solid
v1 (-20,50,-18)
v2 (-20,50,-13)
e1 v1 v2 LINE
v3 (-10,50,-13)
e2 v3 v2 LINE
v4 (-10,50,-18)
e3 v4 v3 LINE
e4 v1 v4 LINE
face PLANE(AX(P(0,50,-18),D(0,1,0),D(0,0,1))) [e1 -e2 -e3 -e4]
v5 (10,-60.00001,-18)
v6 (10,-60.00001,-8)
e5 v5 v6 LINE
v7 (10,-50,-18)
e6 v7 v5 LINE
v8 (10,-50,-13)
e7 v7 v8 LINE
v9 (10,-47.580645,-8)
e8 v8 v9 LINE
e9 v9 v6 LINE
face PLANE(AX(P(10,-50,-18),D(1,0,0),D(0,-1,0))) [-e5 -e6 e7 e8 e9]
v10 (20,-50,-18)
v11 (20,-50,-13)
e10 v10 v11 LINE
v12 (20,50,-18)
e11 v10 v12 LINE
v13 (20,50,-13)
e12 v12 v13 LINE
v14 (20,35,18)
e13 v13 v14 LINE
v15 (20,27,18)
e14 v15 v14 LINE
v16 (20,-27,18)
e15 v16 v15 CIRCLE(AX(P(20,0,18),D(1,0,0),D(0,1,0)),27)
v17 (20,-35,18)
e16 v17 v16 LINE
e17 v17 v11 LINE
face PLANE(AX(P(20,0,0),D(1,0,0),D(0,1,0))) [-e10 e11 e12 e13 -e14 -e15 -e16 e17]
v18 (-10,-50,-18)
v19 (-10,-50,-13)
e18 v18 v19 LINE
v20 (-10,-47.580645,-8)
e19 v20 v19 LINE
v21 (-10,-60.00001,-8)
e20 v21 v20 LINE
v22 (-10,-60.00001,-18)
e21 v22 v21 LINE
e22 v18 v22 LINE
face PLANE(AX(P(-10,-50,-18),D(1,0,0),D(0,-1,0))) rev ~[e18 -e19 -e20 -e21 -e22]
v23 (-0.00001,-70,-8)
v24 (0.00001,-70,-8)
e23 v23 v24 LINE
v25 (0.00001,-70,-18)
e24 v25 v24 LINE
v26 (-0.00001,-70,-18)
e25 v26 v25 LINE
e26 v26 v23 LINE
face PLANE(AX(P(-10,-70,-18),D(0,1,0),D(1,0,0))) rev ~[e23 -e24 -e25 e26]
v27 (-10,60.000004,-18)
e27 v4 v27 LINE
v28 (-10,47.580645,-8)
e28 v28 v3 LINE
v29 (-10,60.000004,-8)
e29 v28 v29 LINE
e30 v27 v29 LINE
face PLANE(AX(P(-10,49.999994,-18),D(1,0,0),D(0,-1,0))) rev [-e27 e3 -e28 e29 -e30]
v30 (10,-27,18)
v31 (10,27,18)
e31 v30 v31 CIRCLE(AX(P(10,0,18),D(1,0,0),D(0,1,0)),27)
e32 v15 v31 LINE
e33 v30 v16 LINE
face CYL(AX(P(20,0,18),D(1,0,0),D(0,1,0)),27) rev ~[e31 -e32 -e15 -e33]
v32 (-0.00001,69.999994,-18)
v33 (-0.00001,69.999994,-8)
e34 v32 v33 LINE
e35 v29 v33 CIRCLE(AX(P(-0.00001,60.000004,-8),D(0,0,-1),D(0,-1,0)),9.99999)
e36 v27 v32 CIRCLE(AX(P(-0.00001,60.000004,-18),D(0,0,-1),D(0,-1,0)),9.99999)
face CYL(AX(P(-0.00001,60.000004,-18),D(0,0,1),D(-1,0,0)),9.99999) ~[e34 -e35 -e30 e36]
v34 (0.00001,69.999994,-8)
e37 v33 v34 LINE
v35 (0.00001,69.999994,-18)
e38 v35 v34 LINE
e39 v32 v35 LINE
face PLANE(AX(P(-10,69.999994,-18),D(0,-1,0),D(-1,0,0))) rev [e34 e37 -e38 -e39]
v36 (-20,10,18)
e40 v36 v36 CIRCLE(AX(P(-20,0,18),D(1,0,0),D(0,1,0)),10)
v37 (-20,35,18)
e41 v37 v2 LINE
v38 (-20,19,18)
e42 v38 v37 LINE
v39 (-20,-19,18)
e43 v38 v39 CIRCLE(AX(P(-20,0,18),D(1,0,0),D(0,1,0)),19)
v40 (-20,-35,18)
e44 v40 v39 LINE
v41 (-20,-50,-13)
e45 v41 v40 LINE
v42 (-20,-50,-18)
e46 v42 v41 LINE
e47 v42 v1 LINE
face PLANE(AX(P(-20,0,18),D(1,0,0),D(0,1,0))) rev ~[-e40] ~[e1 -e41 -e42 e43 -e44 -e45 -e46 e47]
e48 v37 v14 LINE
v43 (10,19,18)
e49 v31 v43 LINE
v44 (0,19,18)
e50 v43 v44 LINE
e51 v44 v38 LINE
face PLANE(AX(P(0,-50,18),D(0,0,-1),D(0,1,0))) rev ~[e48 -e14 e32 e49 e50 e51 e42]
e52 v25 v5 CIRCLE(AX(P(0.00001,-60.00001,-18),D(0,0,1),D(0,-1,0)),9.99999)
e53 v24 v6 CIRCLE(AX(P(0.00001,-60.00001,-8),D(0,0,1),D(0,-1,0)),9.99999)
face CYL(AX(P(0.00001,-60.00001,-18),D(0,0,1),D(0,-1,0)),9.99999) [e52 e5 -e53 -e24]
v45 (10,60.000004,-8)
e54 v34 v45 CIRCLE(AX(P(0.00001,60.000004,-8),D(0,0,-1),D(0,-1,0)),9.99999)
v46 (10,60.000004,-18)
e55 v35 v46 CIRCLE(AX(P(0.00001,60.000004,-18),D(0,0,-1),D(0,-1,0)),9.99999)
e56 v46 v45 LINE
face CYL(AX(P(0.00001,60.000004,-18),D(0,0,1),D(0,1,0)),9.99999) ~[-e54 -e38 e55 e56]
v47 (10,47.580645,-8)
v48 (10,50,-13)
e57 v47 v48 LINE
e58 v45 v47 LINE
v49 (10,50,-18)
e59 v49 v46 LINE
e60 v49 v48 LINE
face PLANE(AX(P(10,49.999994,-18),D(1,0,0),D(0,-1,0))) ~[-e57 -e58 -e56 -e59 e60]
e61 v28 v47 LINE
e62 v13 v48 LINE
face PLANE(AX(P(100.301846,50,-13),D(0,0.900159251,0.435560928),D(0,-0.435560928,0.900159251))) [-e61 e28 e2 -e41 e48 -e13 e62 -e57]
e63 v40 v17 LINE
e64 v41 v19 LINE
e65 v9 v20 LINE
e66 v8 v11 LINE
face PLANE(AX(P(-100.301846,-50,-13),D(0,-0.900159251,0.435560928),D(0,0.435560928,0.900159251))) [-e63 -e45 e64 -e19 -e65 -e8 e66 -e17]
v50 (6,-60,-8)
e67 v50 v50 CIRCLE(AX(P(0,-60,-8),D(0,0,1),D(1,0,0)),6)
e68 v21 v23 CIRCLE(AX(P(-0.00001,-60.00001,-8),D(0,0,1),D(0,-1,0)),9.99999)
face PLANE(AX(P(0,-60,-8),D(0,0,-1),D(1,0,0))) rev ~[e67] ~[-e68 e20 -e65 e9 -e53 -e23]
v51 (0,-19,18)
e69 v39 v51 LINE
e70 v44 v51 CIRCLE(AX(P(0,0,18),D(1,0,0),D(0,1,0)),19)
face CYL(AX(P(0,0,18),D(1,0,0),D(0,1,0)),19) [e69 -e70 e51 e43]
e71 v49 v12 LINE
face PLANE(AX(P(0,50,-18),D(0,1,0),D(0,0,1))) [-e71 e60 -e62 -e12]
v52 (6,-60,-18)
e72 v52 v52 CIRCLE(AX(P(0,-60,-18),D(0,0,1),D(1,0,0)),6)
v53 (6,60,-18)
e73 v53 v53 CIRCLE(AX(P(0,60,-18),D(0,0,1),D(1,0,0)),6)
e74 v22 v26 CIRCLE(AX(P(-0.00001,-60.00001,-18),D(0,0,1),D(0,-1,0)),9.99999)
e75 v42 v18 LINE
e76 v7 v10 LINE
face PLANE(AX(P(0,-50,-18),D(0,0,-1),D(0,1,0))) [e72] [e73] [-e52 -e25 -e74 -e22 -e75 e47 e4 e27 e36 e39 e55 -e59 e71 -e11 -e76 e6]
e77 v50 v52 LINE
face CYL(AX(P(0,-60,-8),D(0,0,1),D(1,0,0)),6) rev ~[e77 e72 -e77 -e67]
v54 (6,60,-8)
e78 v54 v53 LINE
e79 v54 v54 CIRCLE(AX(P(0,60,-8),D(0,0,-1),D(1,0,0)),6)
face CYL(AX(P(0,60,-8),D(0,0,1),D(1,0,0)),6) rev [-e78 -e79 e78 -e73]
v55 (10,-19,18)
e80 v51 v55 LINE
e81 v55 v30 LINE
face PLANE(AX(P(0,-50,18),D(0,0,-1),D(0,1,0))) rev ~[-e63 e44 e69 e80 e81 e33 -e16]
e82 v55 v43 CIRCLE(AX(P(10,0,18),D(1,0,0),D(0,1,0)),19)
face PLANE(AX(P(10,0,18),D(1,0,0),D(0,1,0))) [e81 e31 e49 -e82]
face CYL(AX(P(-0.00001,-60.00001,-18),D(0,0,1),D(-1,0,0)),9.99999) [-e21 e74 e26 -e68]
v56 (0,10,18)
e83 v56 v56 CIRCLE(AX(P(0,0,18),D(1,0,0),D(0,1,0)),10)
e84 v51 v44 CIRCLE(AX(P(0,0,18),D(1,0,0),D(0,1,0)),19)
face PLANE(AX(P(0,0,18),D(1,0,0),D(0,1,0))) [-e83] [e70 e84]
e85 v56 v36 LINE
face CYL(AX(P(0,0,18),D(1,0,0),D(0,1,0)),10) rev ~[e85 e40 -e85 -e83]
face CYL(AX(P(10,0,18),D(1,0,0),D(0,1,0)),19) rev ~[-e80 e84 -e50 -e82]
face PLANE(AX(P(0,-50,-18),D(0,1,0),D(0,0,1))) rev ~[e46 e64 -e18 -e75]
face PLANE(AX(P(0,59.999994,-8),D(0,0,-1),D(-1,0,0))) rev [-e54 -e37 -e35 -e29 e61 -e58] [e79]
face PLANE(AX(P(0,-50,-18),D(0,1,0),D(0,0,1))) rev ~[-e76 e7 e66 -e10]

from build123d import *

# Parameters (mm, degrees)
F0_W         = 100
F0_H         = 36
F1_DEPTH     = 20
F2_W         = 20
F2_H         = 20
F3_DEPTH     = 10
F4_R         = 9.99999
F5_T4_DEPTH  = 200.6036926139
F5_T10_DEPTH = 200.6036926139
F5_T16_DEPTH = 200.6036926139
F5_T23_DEPTH = 200.6036926139
F5_T29_DEPTH = 200.6036926139
F6_R         = 6
F7_DEPTH     = 10.001
F8_T4_DEPTH  = 200.6036926139
F8_T10_DEPTH = 200.6036926139
F8_T16_DEPTH = 200.6036926139
F8_T23_DEPTH = 200.6036926139
F8_T29_DEPTH = 200.6036926139
F9_R         = 27
F10_DEPTH    = 10
F11_R        = 19
F12_DEPTH    = 10
F13_R        = 19
F14_DEPTH    = 20
F15_R        = 10
F16_DEPTH    = 20.001


# Not quite as in the source:
# - a fillet or chamfer that OpenCascade refuses, or shapes differently, is made with other operations: its cross-section is extruded or revolved along the edge and cut away or added
# - a fillet or chamfer is up to 0.001 mm smaller than in the source, because OpenCascade refuses the exact size
# - a pattern or mirror of a feature is missing from the dataset's text; its kind, count and spacing are read off the source's solid


with BuildPart() as f1:
    # F0 (on Right) → F1 (new body, symmetric)
    with BuildSketch(Plane.YZ):
        Rectangle(F0_W, F0_H)
    extrude(amount=F1_DEPTH, both=True)

    # F2 (on face) → F3 (join)
    with BuildSketch(Plane(origin=(0, 0, -18), x_dir=(1, 0, 0), z_dir=(0, 0, -1))):
        with Locations((0, 60)):
            Rectangle(F2_W, F2_H)
    f3 = extrude(amount=-F3_DEPTH)

    # F3_copies: F3 across plane
    add(f3.mirror(Plane.ZX.offset(-3e-06)))

    # F4 (radius 10 in the source; OpenCascade refuses exactly that, so slightly less here)
    f4_edges = [f1.edges().sort_by_distance(p)[0] for p in [
        (10, -70, -13),
        (-10, -70, -13),
        (-10, 69.999994, -13),
        (10, 69.999994, -13),
    ]]
    fillet(f4_edges, radius=F4_R)

    # F5: chamfer of 15 x 31 on 1 edges, made by hand


with BuildPart() as f5_tool2:
    # F5_s3 → F5_t4 (new body)
    with BuildSketch(Plane.YZ.offset(-100.301846307)):
        Polygon((-50, -13), (-35, 18), (-50, 18), align=None)
    extrude(amount=F5_T4_DEPTH)

    split(bisect_by=Plane.XY.offset(-8), keep=Keep.BOTTOM)

    split(bisect_by=Plane.YZ.offset(-10), keep=Keep.BOTTOM)


with BuildPart() as f1_1:
    add(f1.part)

    # F5_t1: cut F5_tool2
    add(f5_tool2.part, mode=Mode.SUBTRACT)


with BuildPart() as f5_tool8:
    # F5_s9 → F5_t10 (new body)
    with BuildSketch(Plane.YZ.offset(-100.301846307)):
        Polygon((-50, -13), (-35, 18), (-50, 18), align=None)
    extrude(amount=F5_T10_DEPTH)

    split(bisect_by=Plane.XY.offset(-8), keep=Keep.TOP)

    split(bisect_by=Plane.YZ.offset(-10), keep=Keep.BOTTOM)


with BuildPart() as f1_2:
    add(f1_1.part)

    # F5_t7: cut F5_tool8
    add(f5_tool8.part, mode=Mode.SUBTRACT)


with BuildPart() as f5_tool14:
    # F5_s15 → F5_t16 (new body)
    with BuildSketch(Plane.YZ.offset(-100.301846307)):
        Polygon((-50, -13), (-35, 18), (-50, 18), align=None)
    extrude(amount=F5_T16_DEPTH)

    split(bisect_by=Plane.YZ.offset(10), keep=Keep.BOTTOM)

    split(bisect_by=Plane.XY.offset(-8), keep=Keep.TOP)

    split(bisect_by=Plane.YZ.offset(-10), keep=Keep.TOP)


with BuildPart() as f1_3:
    add(f1_2.part)

    # F5_t13: cut F5_tool14
    add(f5_tool14.part, mode=Mode.SUBTRACT)


with BuildPart() as f5_tool21:
    # F5_s22 → F5_t23 (new body)
    with BuildSketch(Plane.YZ.offset(-100.301846307)):
        Polygon((-50, -13), (-35, 18), (-50, 18), align=None)
    extrude(amount=F5_T23_DEPTH)

    split(bisect_by=Plane.YZ.offset(10), keep=Keep.TOP)

    split(bisect_by=Plane.XY.offset(-8), keep=Keep.BOTTOM)


with BuildPart() as f1_4:
    add(f1_3.part)

    # F5_t20: cut F5_tool21
    add(f5_tool21.part, mode=Mode.SUBTRACT)


with BuildPart() as f5_tool27:
    # F5_s28 → F5_t29 (new body)
    with BuildSketch(Plane.YZ.offset(-100.301846307)):
        Polygon((-50, -13), (-35, 18), (-50, 18), align=None)
    extrude(amount=F5_T29_DEPTH)

    split(bisect_by=Plane.YZ.offset(10), keep=Keep.TOP)

    split(bisect_by=Plane.XY.offset(-8), keep=Keep.TOP)


with BuildPart() as f1_5:
    add(f1_4.part)

    # F5_t26: cut F5_tool27
    add(f5_tool27.part, mode=Mode.SUBTRACT)

    # F6 (on face) → F7 (cut, through all)
    with BuildSketch(Plane.XY.offset(-8)):
        with Locations((0, -60)):
            Circle(F6_R)
    f7 = extrude(amount=-F7_DEPTH, mode=Mode.SUBTRACT)

    # F7_copies: F7 across plane
    add(f7.mirror(Plane.ZX), mode=Mode.SUBTRACT)

    # F8: chamfer of 15 x 31 on 1 edges, made by hand


with BuildPart() as f8_tool2:
    # F8_s3 → F8_t4 (new body)
    with BuildSketch(Plane.YZ.offset(100.301846307)):
        Polygon((50, -13), (35, 18), (50, 18), align=None)
    extrude(amount=-F8_T4_DEPTH)

    split(bisect_by=Plane.XY.offset(-8), keep=Keep.BOTTOM)

    split(bisect_by=Plane.YZ.offset(10), keep=Keep.TOP)


with BuildPart() as f1_6:
    add(f1_5.part)

    # F8_t1: cut F8_tool2
    add(f8_tool2.part, mode=Mode.SUBTRACT)


with BuildPart() as f8_tool8:
    # F8_s9 → F8_t10 (new body)
    with BuildSketch(Plane.YZ.offset(100.301846307)):
        Polygon((50, -13), (35, 18), (50, 18), align=None)
    extrude(amount=-F8_T10_DEPTH)

    split(bisect_by=Plane.XY.offset(-8), keep=Keep.TOP)

    split(bisect_by=Plane.YZ.offset(10), keep=Keep.TOP)


with BuildPart() as f1_7:
    add(f1_6.part)

    # F8_t7: cut F8_tool8
    add(f8_tool8.part, mode=Mode.SUBTRACT)


with BuildPart() as f8_tool14:
    # F8_s15 → F8_t16 (new body)
    with BuildSketch(Plane.YZ.offset(100.301846307)):
        Polygon((50, -13), (35, 18), (50, 18), align=None)
    extrude(amount=-F8_T16_DEPTH)

    split(bisect_by=Plane.YZ.offset(-10), keep=Keep.TOP)

    split(bisect_by=Plane.XY.offset(-8), keep=Keep.TOP)

    split(bisect_by=Plane.YZ.offset(10), keep=Keep.BOTTOM)


with BuildPart() as f1_8:
    add(f1_7.part)

    # F8_t13: cut F8_tool14
    add(f8_tool14.part, mode=Mode.SUBTRACT)


with BuildPart() as f8_tool21:
    # F8_s22 → F8_t23 (new body)
    with BuildSketch(Plane.YZ.offset(100.301846307)):
        Polygon((50, -13), (35, 18), (50, 18), align=None)
    extrude(amount=-F8_T23_DEPTH)

    split(bisect_by=Plane.YZ.offset(-10), keep=Keep.BOTTOM)

    split(bisect_by=Plane.XY.offset(-8), keep=Keep.BOTTOM)


with BuildPart() as f1_9:
    add(f1_8.part)

    # F8_t20: cut F8_tool21
    add(f8_tool21.part, mode=Mode.SUBTRACT)


with BuildPart() as f8_tool27:
    # F8_s28 → F8_t29 (new body)
    with BuildSketch(Plane.YZ.offset(100.301846307)):
        Polygon((50, -13), (35, 18), (50, 18), align=None)
    extrude(amount=-F8_T29_DEPTH)

    split(bisect_by=Plane.YZ.offset(-10), keep=Keep.BOTTOM)

    split(bisect_by=Plane.XY.offset(-8), keep=Keep.TOP)


with BuildPart() as f1_10:
    add(f1_9.part)

    # F8_t26: cut F8_tool27
    add(f8_tool27.part, mode=Mode.SUBTRACT)

    # F9 (on face) → F10 (cut)
    with BuildSketch(Plane.YZ.offset(20)):
        with Locations((0, 18)):
            Circle(F9_R)
    extrude(amount=-F10_DEPTH, mode=Mode.SUBTRACT)

    # F11 (on face) → F12 (cut)
    with BuildSketch(Plane.YZ.offset(10)):
        with Locations((0, 18)):
            Circle(F11_R)
    extrude(amount=-F12_DEPTH, mode=Mode.SUBTRACT)

    # F13 (on face) → F14 (join)
    with BuildSketch(Plane.YZ):
        with Locations((0, 18)):
            Circle(F13_R)
    extrude(amount=-F14_DEPTH)

    # F15 (on face) → F16 (cut, through all)
    with BuildSketch(Plane.YZ):
        with Locations((0, 18)):
            Circle(F15_R)
    extrude(amount=-F16_DEPTH, mode=Mode.SUBTRACT)


solid = f1_10.part
